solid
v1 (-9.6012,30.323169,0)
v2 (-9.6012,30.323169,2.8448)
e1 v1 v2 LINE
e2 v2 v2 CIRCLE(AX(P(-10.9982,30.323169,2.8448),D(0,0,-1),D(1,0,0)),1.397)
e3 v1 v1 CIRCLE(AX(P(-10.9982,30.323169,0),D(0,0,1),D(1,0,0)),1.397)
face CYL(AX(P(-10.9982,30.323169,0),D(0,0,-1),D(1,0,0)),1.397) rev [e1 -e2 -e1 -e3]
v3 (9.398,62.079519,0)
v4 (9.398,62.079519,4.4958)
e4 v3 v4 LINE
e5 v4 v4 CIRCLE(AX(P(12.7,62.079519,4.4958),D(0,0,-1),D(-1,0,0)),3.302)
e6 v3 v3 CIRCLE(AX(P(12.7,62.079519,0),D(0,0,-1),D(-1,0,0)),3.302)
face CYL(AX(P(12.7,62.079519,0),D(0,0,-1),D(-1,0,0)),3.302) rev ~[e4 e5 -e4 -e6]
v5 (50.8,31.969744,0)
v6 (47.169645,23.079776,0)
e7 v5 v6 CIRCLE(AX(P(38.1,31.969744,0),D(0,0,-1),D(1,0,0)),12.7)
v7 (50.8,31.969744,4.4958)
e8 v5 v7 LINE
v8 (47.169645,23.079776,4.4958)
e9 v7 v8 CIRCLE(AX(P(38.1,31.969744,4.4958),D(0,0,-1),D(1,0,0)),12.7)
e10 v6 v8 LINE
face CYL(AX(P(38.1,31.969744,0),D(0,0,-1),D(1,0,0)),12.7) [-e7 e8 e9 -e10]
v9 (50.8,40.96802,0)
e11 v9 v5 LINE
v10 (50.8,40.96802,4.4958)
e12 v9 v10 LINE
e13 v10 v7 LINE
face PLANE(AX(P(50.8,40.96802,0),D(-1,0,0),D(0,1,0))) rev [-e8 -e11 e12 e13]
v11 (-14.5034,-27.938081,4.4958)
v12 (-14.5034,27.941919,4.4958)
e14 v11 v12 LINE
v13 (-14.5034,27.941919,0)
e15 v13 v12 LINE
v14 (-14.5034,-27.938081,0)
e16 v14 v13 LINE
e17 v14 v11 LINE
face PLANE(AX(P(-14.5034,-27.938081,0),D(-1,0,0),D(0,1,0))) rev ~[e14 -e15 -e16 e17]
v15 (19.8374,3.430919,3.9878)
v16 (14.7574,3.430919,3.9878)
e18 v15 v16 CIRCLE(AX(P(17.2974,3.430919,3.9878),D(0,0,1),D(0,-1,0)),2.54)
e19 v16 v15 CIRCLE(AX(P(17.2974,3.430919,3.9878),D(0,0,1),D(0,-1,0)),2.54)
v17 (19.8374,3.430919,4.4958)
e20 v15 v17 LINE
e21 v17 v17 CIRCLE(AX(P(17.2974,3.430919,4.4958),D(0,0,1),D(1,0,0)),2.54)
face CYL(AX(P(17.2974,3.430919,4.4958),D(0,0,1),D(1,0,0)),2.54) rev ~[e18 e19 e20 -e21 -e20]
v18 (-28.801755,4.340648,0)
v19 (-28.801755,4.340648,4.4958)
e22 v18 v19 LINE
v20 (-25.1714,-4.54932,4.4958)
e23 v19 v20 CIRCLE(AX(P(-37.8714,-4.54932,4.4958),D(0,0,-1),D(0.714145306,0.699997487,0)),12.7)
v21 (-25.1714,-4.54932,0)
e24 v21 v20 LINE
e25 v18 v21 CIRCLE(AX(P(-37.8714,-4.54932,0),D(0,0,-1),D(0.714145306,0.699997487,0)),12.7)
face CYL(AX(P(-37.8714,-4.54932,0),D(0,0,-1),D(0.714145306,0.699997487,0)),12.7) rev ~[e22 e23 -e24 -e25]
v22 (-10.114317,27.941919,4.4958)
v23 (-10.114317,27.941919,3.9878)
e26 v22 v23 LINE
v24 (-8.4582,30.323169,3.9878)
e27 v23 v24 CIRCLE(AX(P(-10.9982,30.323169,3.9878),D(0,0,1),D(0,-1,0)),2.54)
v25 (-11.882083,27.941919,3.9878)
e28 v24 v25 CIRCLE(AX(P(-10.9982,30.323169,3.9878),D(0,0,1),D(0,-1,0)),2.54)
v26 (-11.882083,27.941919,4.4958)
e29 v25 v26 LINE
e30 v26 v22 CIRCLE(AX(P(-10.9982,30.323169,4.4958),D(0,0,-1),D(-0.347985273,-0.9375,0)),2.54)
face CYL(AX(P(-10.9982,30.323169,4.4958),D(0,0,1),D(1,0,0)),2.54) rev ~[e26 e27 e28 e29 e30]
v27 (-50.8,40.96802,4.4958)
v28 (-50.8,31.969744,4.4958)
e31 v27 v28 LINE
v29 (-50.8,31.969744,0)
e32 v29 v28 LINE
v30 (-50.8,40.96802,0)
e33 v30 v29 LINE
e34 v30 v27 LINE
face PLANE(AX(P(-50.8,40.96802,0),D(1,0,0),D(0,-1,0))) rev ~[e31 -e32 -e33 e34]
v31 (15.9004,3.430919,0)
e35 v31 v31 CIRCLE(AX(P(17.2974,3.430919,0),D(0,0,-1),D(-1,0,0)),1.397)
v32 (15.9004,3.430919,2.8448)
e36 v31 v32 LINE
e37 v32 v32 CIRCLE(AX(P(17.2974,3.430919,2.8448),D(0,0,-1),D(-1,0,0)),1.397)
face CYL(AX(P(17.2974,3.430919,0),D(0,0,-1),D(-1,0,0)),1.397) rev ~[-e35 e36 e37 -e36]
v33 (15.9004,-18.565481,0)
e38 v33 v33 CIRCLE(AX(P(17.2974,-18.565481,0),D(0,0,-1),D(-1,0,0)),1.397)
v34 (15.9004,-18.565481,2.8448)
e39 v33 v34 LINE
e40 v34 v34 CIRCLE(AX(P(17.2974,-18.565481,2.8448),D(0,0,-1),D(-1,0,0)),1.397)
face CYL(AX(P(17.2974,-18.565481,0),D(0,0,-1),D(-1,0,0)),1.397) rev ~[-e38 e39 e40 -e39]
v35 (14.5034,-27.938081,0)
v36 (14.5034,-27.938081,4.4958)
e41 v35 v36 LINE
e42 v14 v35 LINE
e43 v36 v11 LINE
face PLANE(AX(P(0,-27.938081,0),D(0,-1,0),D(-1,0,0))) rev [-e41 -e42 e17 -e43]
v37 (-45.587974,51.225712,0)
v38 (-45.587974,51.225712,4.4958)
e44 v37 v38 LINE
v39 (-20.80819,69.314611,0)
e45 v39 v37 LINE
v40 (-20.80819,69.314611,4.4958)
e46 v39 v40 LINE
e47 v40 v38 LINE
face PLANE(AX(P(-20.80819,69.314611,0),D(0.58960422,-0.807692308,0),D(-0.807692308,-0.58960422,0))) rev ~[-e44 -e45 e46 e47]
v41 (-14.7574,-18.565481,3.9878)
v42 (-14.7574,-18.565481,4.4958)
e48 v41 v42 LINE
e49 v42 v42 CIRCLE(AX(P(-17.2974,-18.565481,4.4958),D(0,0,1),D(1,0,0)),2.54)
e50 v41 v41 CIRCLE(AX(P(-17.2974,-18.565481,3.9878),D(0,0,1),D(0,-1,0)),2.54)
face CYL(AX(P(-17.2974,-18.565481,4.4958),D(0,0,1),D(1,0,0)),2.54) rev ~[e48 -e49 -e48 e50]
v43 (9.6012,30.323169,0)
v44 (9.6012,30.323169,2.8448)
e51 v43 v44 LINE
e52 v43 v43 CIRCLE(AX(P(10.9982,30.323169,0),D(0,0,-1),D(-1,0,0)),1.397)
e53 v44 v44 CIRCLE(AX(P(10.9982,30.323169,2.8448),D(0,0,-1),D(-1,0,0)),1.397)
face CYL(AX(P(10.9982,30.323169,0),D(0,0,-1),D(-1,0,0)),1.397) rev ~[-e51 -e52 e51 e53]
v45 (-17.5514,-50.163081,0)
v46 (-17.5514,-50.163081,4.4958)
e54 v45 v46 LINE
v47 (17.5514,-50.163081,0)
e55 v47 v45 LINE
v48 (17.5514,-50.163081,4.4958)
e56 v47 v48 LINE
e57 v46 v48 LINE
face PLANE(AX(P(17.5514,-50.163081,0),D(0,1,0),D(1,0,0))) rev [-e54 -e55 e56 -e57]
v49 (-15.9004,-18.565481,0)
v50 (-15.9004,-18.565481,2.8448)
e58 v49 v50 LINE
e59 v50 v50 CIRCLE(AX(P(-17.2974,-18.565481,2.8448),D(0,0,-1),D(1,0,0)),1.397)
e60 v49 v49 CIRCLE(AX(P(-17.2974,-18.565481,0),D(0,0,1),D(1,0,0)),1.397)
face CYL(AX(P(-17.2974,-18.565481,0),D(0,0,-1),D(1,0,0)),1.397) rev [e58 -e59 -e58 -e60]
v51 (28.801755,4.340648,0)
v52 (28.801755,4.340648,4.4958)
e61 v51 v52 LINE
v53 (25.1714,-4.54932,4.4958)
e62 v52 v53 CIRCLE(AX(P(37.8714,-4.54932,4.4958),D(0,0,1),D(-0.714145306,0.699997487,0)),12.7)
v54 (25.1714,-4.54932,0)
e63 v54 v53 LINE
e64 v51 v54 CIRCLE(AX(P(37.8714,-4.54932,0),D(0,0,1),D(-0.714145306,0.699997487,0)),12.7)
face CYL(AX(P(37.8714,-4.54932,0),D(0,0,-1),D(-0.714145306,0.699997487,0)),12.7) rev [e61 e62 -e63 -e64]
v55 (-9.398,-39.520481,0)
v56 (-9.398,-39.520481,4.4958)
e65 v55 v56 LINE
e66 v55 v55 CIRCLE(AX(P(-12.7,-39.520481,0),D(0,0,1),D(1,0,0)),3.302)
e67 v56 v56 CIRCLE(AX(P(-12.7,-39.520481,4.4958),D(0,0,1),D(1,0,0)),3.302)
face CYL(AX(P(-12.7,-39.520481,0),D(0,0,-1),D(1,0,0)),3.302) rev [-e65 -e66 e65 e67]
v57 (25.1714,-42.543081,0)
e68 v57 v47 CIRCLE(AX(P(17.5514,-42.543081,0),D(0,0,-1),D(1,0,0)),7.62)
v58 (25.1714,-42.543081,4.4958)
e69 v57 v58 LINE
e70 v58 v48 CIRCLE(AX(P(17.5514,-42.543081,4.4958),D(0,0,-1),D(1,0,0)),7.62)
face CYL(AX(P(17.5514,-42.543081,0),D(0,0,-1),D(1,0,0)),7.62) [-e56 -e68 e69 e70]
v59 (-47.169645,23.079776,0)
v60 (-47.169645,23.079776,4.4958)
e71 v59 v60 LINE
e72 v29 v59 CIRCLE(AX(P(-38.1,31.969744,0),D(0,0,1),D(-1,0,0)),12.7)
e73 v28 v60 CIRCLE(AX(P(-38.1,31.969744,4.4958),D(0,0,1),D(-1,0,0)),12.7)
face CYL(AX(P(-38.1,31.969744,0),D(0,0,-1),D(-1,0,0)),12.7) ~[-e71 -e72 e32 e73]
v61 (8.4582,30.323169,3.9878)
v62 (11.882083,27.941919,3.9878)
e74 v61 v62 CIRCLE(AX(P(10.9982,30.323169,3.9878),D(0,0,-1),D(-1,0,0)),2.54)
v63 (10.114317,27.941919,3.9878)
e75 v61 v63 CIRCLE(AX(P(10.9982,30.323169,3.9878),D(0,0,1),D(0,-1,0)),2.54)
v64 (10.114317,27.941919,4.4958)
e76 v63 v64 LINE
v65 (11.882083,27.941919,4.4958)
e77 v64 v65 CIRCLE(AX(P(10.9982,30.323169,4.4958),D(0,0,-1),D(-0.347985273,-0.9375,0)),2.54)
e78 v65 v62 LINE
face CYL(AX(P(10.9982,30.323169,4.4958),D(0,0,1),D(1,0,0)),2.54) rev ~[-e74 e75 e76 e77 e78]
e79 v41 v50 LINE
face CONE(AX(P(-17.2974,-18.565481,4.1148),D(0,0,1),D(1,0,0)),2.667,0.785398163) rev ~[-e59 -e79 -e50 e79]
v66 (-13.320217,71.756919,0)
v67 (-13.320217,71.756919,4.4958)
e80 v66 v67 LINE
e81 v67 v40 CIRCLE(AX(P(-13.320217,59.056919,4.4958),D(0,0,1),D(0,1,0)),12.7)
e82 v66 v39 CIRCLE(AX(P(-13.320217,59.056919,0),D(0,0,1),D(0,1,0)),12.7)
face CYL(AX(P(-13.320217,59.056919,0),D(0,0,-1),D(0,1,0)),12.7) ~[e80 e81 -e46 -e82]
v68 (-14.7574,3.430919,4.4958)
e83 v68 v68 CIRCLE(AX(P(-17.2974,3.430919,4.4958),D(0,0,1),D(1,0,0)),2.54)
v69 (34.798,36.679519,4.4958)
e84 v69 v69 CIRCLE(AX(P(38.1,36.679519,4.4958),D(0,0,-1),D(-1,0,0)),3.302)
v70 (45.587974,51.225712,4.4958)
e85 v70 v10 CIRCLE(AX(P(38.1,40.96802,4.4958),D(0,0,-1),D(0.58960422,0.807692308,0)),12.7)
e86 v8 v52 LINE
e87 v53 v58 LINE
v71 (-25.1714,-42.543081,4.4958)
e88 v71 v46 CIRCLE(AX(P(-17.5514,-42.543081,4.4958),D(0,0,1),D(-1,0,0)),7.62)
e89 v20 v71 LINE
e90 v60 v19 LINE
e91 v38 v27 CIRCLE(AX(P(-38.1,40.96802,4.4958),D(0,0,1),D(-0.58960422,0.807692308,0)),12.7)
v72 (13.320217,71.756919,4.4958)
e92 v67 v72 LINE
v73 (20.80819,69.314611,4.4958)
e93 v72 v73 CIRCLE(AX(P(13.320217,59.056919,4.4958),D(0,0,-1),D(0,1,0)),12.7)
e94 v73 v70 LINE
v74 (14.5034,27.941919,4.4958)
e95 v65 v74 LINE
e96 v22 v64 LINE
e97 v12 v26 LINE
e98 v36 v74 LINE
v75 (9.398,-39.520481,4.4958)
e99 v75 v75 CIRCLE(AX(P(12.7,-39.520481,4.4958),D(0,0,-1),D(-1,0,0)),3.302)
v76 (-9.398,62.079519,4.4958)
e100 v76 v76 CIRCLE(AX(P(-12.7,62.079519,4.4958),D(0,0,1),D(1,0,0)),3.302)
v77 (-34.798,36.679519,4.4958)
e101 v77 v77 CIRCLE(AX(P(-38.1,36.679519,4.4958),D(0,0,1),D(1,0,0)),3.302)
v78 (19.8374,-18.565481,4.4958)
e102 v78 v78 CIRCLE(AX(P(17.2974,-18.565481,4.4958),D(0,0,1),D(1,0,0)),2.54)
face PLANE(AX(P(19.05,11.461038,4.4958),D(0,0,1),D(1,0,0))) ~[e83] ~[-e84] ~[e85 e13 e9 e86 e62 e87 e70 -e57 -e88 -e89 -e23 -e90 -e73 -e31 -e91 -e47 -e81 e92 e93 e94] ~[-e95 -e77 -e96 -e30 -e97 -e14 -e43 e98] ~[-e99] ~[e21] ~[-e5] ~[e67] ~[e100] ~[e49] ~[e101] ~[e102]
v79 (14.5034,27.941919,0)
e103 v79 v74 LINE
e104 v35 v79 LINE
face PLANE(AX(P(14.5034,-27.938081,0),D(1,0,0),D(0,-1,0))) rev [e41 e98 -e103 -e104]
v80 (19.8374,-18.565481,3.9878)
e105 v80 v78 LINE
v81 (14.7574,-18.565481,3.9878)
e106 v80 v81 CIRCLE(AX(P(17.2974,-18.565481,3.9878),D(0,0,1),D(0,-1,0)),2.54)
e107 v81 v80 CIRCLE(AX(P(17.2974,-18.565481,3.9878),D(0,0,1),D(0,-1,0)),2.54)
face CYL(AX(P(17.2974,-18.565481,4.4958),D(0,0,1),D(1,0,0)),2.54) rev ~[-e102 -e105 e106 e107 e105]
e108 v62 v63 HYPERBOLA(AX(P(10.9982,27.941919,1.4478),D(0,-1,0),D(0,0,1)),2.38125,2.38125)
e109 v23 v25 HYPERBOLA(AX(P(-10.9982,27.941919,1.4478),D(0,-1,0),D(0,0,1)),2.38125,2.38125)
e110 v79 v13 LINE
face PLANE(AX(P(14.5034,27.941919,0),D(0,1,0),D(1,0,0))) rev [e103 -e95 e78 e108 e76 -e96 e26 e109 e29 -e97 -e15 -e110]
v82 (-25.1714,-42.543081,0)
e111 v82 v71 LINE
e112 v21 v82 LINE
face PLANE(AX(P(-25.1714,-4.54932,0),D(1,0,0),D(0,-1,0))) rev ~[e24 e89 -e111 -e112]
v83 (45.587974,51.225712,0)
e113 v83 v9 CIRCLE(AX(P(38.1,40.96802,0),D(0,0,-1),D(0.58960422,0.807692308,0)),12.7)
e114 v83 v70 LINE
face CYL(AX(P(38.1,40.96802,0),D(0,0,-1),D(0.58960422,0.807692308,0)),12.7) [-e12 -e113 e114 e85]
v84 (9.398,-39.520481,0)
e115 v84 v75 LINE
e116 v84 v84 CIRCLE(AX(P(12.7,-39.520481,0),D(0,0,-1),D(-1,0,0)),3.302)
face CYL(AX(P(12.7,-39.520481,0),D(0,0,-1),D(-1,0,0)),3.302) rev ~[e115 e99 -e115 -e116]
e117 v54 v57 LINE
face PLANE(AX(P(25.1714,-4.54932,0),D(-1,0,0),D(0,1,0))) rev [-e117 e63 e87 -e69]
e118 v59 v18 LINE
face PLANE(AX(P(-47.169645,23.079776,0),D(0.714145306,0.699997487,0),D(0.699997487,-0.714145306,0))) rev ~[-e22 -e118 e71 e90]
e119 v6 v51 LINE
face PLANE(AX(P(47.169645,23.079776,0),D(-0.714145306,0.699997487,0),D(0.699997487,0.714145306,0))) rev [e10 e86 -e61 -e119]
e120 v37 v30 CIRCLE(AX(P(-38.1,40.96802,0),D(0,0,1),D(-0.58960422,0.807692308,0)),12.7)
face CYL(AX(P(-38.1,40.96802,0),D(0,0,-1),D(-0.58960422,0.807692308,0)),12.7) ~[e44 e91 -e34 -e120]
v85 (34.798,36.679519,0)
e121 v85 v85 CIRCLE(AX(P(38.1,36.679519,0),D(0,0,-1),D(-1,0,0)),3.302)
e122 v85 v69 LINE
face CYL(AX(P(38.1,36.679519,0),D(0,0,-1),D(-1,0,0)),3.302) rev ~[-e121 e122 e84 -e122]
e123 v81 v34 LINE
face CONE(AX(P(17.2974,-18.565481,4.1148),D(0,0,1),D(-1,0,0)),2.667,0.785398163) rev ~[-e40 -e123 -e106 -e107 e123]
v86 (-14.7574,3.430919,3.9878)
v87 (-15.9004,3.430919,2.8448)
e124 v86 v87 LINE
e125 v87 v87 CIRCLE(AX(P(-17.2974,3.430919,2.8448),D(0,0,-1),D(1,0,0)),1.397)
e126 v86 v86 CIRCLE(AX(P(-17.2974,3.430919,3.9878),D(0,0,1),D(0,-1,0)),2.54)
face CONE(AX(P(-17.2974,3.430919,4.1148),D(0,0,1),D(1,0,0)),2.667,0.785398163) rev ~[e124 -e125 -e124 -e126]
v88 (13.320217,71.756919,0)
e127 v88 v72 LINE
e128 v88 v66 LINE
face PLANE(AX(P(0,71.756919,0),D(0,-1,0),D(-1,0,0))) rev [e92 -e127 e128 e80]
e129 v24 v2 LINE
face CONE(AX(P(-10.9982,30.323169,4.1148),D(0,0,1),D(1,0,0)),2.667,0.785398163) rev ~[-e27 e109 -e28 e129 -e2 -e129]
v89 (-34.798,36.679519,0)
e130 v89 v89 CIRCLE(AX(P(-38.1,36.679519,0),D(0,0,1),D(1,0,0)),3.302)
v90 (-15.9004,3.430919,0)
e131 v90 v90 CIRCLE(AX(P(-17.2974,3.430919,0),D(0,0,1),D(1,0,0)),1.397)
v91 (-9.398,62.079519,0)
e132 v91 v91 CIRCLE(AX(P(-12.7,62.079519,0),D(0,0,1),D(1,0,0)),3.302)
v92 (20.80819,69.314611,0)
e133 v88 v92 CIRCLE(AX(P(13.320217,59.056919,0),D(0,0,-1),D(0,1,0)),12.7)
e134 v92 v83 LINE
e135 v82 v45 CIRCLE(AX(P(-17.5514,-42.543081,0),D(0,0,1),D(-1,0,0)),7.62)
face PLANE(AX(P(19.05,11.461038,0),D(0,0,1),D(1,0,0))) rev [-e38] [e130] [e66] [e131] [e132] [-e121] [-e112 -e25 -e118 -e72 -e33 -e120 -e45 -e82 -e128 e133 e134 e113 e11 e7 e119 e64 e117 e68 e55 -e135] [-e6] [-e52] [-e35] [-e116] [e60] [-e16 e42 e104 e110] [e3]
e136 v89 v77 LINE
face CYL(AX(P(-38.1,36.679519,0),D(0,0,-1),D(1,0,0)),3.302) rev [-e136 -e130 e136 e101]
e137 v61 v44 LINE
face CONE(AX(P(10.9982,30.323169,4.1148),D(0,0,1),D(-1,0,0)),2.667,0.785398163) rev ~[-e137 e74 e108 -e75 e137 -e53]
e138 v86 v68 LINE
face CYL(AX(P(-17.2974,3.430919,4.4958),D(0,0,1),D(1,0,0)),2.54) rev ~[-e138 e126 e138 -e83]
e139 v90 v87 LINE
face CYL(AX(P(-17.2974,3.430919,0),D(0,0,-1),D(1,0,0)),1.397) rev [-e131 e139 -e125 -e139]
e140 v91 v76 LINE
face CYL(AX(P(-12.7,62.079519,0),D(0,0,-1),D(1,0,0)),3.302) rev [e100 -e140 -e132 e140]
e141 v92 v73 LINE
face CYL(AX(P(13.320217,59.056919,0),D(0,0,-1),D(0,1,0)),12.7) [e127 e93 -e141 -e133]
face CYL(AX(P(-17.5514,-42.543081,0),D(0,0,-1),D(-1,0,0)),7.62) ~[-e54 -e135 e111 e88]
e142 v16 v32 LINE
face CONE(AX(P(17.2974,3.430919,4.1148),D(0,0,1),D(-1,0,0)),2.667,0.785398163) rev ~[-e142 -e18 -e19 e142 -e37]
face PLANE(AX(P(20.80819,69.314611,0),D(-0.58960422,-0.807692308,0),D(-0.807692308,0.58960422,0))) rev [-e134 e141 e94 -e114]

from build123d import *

# Parameters (mm, degrees)
F0_R         = 3.302
F0_R_2       = 1.397
F1_DEPTH     = 4.4958
F3_R         = 2.54
F4_DEPTH     = 0.381
F5_S5_R      = 2.54
F5_T6_DEPTH  = 5
F5_S11_R     = 2.54
F5_T12_DEPTH = 5
F5_S17_R     = 2.54
F5_T18_DEPTH = 5
F5_S23_R     = 2.54
F5_T24_DEPTH = 5
F5_S29_R     = 2.54
F5_T30_DEPTH = 5
F5_S35_R     = 2.54
F5_T36_DEPTH = 5


# Not quite as in the source:
# - a fillet or chamfer that OpenCascade refuses, or shapes differently, is made with other operations: its cross-section is extruded or revolved along the edge and cut away or added


with BuildPart() as f1:
    # F0 (on Top) → F1 (new body)
    with BuildSketch(Plane.XY):
        with BuildLine():
            Line((0, 71.7569190334), (-13.3202167361, 71.7569190334))
            ThreePointArc((-13.3202167361, 71.7569190334), (-17.2583195593, 71.1309136563), (-20.8081903285, 69.3146113411))
            Line((-20.8081903285, 69.3146113411), (-45.5879735924, 51.2257120897))
            ThreePointArc((-45.5879735924, 51.2257120897), (-49.4222626852, 46.7209640446), (-50.8, 40.968019782))
            Line((-50.8, 40.968019782), (-50.8, 31.9697443563))
            ThreePointArc((-50.8, 31.9697443563), (-49.8574337411, 27.1684162251), (-47.1696453822, 23.0797762663))
            Line((-47.1696453822, 23.0797762663), (-28.8017546178, 4.3406476252))
            ThreePointArc((-28.8017546178, 4.3406476252), (-26.1139662589, 0.2520076664), (-25.1714, -4.5493204647))
            Line((-25.1714, -4.5493204647), (-25.1714, -42.5430809666))
            ThreePointArc((-25.1714, -42.5430809666), (-22.9395536726, -47.9312346392), (-17.5514, -50.1630809666))
            Line((-17.5514, -50.1630809666), (0, -50.1630809666))
            Line((0, -50.1630809666), (0, -27.9380809666))
            Line((0, -27.9380809666), (-14.5034, -27.9380809666))
            Line((-14.5034, -27.9380809666), (-14.5034, 27.9419190334))
            Line((-14.5034, 27.9419190334), (0, 27.9419190334))
            Line((0, 27.9419190334), (0, 71.7569190334))
        make_face()
        with Locations((-12.7, -39.5204809666)):
            Circle(F0_R, mode=Mode.SUBTRACT)
        with Locations((-17.2974, -18.5654809666)):
            Circle(F0_R_2, mode=Mode.SUBTRACT)
        with Locations((-17.2974, 3.4309190334)):
            Circle(F0_R_2, mode=Mode.SUBTRACT)
        with Locations((-38.1, 36.6795190334)):
            Circle(F0_R, mode=Mode.SUBTRACT)
        with Locations((-10.9982, 30.3231690334)):
            Circle(F0_R_2, mode=Mode.SUBTRACT)
        with Locations((-12.7, 62.0795190334)):
            Circle(F0_R, mode=Mode.SUBTRACT)
    extrude(amount=F1_DEPTH)

    # F2: F1 across face


with BuildPart() as f1_1:
    add(f1.part)
    add(f1.part.mirror(Plane(origin=(0, 49.8494190334, 2.2479), x_dir=(0, 1, 0), z_dir=(1, 0, 0))))

    # F3 (on face) → F4 (cut)
    with BuildSketch(Plane.XY.offset(4.4958)):
        with Locations((-10.9982, 30.3231690334)):
            Circle(F3_R)
        with Locations((-17.2974, 3.4309190334)):
            Circle(F3_R)
        with Locations((-17.2974, -18.5654809666)):
            Circle(F3_R)
        with Locations((10.9982, 30.3231690334)):
            Circle(F3_R)
        with Locations((17.2974, 3.4309190334)):
            Circle(F3_R)
        with Locations((17.2974, -18.5654809666)):
            Circle(F3_R)
    extrude(amount=-F4_DEPTH, mode=Mode.SUBTRACT)

    # F5: chamfer of 1.27 on 6 edges, made by hand


with BuildPart() as f5_tool2:
    # F5_s3 → F5_t4 (revolve)
    with BuildSketch(Plane.XZ.offset(-30.3231690334)):
        Polygon((-8.3312, 4.1148), (-9.6012, 2.8448), (-9.6012, 4.1148), align=None)
    revolve(axis=Axis((-10.9982, 30.3231690334, 4.1148), (0, 0, -1)))

    # F5_s5 → F5_t6 (intersect, symmetric)
    with BuildSketch(Plane.XY.offset(3.5)):
        with Locations((-10.9982, 30.3231690334)):
            Circle(F5_S5_R)
    extrude(amount=F5_T6_DEPTH, both=True, mode=Mode.INTERSECT)


with BuildPart() as f1_2:
    add(f1_1.part)

    # F5_t1: cut F5_tool2
    add(f5_tool2.part, mode=Mode.SUBTRACT)


with BuildPart() as f5_tool8:
    # F5_s9 → F5_t10 (revolve)
    with BuildSketch(Plane.XZ.offset(-30.3231690334)):
        Polygon((8.3312, 4.1148), (9.6012, 2.8448), (9.6012, 4.1148), align=None)
    revolve(axis=Axis((10.9982, 30.3231690334, 4.1148), (0, 0, -1)))

    # F5_s11 → F5_t12 (intersect, symmetric)
    with BuildSketch(Plane.XY.offset(3.5)):
        with Locations((10.9982, 30.3231690334)):
            Circle(F5_S11_R)
    extrude(amount=F5_T12_DEPTH, both=True, mode=Mode.INTERSECT)


with BuildPart() as f1_3:
    add(f1_2.part)

    # F5_t7: cut F5_tool8
    add(f5_tool8.part, mode=Mode.SUBTRACT)


with BuildPart() as f5_tool14:
    # F5_s15 → F5_t16 (revolve)
    with BuildSketch(Plane.XZ.offset(-3.4309190334)):
        Polygon((-14.6304, 4.1148), (-15.9004, 2.8448), (-15.9004, 4.1148), align=None)
    revolve(axis=Axis((-17.2974, 3.4309190334, 4.1148), (0, 0, -1)))

    # F5_s17 → F5_t18 (intersect, symmetric)
    with BuildSketch(Plane.XY.offset(3.5)):
        with Locations((-17.2974, 3.4309190334)):
            Circle(F5_S17_R)
    extrude(amount=F5_T18_DEPTH, both=True, mode=Mode.INTERSECT)


with BuildPart() as f1_4:
    add(f1_3.part)

    # F5_t13: cut F5_tool14
    add(f5_tool14.part, mode=Mode.SUBTRACT)


with BuildPart() as f5_tool20:
    # F5_s21 → F5_t22 (revolve)
    with BuildSketch(Plane.XZ.offset(-3.4309190334)):
        Polygon((14.6304, 4.1148), (15.9004, 2.8448), (15.9004, 4.1148), align=None)
    revolve(axis=Axis((17.2974, 3.4309190334, 4.1148), (0, 0, -1)))

    # F5_s23 → F5_t24 (intersect, symmetric)
    with BuildSketch(Plane.XY.offset(3.5)):
        with Locations((17.2974, 3.4309190334)):
            Circle(F5_S23_R)
    extrude(amount=F5_T24_DEPTH, both=True, mode=Mode.INTERSECT)


with BuildPart() as f1_5:
    add(f1_4.part)

    # F5_t19: cut F5_tool20
    add(f5_tool20.part, mode=Mode.SUBTRACT)


with BuildPart() as f5_tool26:
    # F5_s27 → F5_t28 (revolve)
    with BuildSketch(Plane.XZ.offset(18.5654809666)):
        Polygon((-14.6304, 4.1148), (-15.9004, 2.8448), (-15.9004, 4.1148), align=None)
    revolve(axis=Axis((-17.2974, -18.5654809666, 4.1148), (0, 0, -1)))

    # F5_s29 → F5_t30 (intersect, symmetric)
    with BuildSketch(Plane.XY.offset(3.5)):
        with Locations((-17.2974, -18.5654809666)):
            Circle(F5_S29_R)
    extrude(amount=F5_T30_DEPTH, both=True, mode=Mode.INTERSECT)


with BuildPart() as f1_6:
    add(f1_5.part)

    # F5_t25: cut F5_tool26
    add(f5_tool26.part, mode=Mode.SUBTRACT)


with BuildPart() as f5_tool32:
    # F5_s33 → F5_t34 (revolve)
    with BuildSketch(Plane.XZ.offset(18.5654809666)):
        Polygon((14.6304, 4.1148), (15.9004, 2.8448), (15.9004, 4.1148), align=None)
    revolve(axis=Axis((17.2974, -18.5654809666, 4.1148), (0, 0, -1)))

    # F5_s35 → F5_t36 (intersect, symmetric)
    with BuildSketch(Plane.XY.offset(3.5)):
        with Locations((17.2974, -18.5654809666)):
            Circle(F5_S35_R)
    extrude(amount=F5_T36_DEPTH, both=True, mode=Mode.INTERSECT)


with BuildPart() as f1_7:
    add(f1_6.part)

    # F5_t31: cut F5_tool32
    add(f5_tool32.part, mode=Mode.SUBTRACT)


solid = f1_7.part
